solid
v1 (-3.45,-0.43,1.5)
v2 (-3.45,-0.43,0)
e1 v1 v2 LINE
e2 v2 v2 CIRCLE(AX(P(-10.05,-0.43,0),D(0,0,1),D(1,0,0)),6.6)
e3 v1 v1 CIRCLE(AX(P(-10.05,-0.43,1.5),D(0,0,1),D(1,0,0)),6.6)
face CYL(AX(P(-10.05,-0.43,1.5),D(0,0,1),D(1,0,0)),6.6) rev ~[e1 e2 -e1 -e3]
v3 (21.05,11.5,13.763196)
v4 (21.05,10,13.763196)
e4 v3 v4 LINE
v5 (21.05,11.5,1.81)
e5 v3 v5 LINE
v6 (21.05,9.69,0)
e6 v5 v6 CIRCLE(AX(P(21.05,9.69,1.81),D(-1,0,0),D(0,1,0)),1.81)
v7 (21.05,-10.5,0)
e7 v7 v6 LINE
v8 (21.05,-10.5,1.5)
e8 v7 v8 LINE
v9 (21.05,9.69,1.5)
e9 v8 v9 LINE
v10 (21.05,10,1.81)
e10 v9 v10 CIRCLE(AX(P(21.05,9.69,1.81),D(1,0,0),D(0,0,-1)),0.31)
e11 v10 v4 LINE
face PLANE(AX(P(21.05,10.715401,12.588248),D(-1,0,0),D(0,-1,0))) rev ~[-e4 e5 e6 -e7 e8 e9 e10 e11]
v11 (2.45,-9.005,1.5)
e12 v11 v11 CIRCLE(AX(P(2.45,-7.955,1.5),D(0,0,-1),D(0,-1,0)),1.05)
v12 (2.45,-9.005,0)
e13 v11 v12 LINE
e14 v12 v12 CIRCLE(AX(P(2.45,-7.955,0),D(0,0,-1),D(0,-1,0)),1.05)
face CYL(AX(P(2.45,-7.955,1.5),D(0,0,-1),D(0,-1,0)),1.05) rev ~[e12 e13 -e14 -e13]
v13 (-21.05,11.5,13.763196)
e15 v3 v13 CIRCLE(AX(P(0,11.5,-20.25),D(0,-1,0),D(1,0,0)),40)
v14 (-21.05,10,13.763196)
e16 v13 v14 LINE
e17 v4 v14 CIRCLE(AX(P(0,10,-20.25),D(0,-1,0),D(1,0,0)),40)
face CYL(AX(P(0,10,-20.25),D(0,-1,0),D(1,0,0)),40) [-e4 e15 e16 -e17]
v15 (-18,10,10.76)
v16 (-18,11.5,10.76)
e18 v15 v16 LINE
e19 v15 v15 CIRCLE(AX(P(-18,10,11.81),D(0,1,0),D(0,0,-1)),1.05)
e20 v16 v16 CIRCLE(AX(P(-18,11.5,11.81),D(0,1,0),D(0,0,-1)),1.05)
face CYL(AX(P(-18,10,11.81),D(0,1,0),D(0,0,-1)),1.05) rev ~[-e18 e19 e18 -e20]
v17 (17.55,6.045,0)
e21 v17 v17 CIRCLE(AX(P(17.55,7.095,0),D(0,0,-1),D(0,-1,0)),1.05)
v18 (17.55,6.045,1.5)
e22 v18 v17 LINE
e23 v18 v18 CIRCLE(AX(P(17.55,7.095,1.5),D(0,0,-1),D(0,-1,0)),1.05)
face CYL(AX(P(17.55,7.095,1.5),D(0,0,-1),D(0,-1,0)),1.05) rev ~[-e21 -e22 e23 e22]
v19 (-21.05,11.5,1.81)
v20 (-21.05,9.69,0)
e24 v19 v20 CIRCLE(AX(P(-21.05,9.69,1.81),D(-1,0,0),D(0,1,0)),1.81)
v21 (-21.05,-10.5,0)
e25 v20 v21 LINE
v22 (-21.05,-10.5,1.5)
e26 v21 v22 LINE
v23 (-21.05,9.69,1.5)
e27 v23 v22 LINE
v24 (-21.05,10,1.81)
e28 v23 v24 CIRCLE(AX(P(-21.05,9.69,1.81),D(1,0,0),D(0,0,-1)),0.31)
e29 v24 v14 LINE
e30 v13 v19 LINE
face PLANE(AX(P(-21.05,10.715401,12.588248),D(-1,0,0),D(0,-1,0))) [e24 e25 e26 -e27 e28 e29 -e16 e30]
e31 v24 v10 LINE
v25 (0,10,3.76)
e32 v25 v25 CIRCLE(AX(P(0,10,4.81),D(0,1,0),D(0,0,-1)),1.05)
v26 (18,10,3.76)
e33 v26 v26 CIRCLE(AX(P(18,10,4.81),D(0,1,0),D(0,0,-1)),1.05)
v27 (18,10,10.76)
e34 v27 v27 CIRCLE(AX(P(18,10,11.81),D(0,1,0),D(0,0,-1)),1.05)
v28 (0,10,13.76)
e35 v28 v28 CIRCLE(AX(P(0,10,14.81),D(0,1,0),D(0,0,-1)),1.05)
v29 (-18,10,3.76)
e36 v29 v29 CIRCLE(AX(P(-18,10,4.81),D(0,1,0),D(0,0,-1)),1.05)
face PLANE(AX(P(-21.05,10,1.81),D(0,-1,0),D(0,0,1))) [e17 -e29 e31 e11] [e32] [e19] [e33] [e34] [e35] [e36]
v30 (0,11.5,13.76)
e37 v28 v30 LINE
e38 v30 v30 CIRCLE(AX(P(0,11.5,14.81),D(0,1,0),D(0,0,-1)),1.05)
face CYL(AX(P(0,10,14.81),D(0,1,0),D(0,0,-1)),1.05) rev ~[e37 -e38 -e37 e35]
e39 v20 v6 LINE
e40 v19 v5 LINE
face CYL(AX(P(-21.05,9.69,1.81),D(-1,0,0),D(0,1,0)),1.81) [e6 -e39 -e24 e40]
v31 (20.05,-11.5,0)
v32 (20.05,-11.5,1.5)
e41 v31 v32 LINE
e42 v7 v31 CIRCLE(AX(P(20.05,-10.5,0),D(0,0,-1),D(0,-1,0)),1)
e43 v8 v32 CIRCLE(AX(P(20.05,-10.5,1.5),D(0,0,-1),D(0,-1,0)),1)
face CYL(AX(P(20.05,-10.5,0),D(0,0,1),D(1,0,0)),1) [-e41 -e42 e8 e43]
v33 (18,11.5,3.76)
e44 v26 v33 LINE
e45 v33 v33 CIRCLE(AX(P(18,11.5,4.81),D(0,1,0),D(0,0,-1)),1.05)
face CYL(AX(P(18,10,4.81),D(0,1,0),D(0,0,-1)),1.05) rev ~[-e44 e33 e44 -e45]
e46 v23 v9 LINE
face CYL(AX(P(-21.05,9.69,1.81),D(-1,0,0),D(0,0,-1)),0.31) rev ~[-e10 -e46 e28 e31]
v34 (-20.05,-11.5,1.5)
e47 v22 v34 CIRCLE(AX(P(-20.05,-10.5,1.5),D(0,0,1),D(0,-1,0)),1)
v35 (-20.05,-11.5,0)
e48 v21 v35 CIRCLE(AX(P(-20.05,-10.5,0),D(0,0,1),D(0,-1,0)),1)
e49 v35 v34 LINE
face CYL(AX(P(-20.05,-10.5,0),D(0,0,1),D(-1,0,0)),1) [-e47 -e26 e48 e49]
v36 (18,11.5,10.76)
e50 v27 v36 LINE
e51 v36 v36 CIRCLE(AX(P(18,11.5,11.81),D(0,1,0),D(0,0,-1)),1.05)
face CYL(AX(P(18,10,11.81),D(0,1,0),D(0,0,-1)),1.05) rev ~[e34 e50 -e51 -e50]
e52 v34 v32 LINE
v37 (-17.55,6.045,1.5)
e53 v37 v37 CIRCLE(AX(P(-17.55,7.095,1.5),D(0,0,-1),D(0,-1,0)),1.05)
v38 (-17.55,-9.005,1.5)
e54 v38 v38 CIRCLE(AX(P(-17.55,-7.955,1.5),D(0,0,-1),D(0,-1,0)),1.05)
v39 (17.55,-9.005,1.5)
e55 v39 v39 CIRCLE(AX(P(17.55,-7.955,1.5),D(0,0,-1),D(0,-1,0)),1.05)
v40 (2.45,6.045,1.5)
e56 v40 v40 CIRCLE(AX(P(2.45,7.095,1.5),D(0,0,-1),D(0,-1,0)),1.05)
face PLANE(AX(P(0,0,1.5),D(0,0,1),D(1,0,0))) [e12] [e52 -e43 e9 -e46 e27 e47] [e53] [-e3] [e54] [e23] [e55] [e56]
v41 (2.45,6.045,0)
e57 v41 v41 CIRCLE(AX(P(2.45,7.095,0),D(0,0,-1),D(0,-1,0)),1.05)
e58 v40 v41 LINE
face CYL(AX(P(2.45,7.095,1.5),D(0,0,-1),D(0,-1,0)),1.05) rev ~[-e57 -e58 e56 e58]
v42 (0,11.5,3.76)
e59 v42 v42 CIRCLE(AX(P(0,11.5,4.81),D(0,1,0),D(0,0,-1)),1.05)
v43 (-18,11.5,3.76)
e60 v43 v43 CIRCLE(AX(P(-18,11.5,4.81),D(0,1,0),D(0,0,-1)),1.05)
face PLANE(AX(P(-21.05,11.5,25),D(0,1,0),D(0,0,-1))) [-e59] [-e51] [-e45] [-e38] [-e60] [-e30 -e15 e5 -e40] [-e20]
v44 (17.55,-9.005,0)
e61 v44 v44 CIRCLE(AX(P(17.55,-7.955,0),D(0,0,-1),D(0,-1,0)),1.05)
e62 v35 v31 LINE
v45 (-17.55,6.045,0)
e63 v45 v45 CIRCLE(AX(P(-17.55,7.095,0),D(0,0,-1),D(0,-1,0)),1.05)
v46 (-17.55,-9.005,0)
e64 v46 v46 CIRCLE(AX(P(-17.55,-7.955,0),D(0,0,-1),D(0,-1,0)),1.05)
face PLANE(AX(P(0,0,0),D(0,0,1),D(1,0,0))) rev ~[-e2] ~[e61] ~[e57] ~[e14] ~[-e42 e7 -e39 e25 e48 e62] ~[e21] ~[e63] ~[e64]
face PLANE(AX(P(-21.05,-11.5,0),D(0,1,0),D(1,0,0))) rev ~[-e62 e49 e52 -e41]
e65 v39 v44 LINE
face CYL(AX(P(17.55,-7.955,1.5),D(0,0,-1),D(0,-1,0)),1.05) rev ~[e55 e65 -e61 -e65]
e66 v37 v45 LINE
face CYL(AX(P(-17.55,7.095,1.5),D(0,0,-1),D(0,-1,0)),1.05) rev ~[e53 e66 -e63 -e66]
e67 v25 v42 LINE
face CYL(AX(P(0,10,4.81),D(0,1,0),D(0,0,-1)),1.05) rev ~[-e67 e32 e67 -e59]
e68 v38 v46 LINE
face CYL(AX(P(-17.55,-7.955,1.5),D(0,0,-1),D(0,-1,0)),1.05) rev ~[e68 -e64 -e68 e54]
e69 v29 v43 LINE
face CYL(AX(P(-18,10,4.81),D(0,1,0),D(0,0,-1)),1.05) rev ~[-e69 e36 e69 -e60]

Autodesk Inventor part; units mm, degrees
ref_plane "YZ Plane" through (0, 0, 0) normal (1, 0, 0) x (0, 1, 0)
ref_plane "XZ Plane" through (0, 0, 0) normal (0, 1, 0) x (-1, 0, 0)
ref_plane "XY Plane" through (0, 0, 0) normal (0, 0, 1) x (1, 0, 0)
sketch "Sketch1" plane through (0, 0, 0) normal (0, 0, 1) x (1, 0, 0)
  line L0 (-21.05, -11.5) -> (21.05, -11.5)
  line L1 (21.05, -11.5) -> (21.05, 11.5)
  line L2 (21.05, 11.5) -> (-21.05, 11.5)
  line L3 (-21.05, 11.5) -> (-21.05, -11.5)
  line L4 (-21.05, -11.5) -> (21.05, 11.5) construction
  line L5 (21.05, -11.5) -> (-21.05, 11.5) construction
  point P0 (0, 0)
  dimension "d0" = 42.1
  dimension "d1" = 23
extrude "Plate1" add sketch "Sketch1" along normal blind 1.5
sketch "Sketch2" plane through (0, 0, 1.5) normal (0, 0, 1) x (1, 0, 0)
  circle A0 centre (17.55, 7.095) radius 0.7835 projected
  circle A1 centre (17.55, -7.955) radius 0.7835 projected
  circle A2 centre (2.45, 7.095) radius 0.7835 projected
  circle A3 centre (2.45, -7.955) radius 0.7835 projected
  circle A4 centre (-17.55, 7.095) radius 0.7835 projected
  circle A5 centre (-17.55, -7.955) radius 0.7835 projected
  point P0 (0, 0)
hole "Hole1" at (17.55, -7.955, 1.5) at (2.45, -7.955, 1.5) at (-17.55, -7.955, 1.5) at (-17.55, 7.095, 1.5) at (2.45, 7.095, 1.5) at (17.55, 7.095, 1.5) direction (0, 0, -1) diameter 2.1 end through all
sketch "Sketch3" plane through (0, 0, 1.5) normal (0, 0, 1) x (1, 0, 0)
  circle A0 centre (-10.05, -0.43) radius 6.4 projected
  circle A1 centre (-10.05, -0.43) radius 6.6
  point P0 (0, 0)
  dimension "d10" = 0.2
extrude "Extrusion1" cut sketch "Sketch3" against normal through all contours A0 | A1
sketch "Sketch4" plane through (-21.05, 10, 0) normal (0, 1, 0) x (-1, 0, 0)
  line L0 (-42.1, 0) -> (0, 0)
  line L1 (0, 0) -> (0, 25)
  line L2 (0, 25) -> (-42.1, 25)
  line L3 (-42.1, 25) -> (-42.1, 0)
edge flange "Flange1" height 25 angle 90 thickness 1.5 bend radius 0.31 thickness toward (0, 1, 0) relief tear relief width 1.5 relief depth 0.75 edges at (0, 11.5, 1.5) wall of the first edge with corners at (21.05, 10, 0) (-21.05, 10, 0) (-21.05, 10, 25) (21.05, 10, 25)
bend "Bend1"
corner "Corner1"
sketch "Sketch5" plane through (-21.05, 10, 25) normal (0, -1, 0) x (1, 0, 0)
  circle A0 centre (21.05, -45.25) radius 40 projected
  circle A1 centre (21.05, -45.25) radius 53
  point P0 (21.05, -25)
  dimension "d23" = 13
extrude "Cut1" cut sketch "Sketch5" against normal blind 1.5
fillet "Corner Round1" radius 1 2 edges at (21.05, -11.5, 0.75) (-21.05, -11.5, 0.75)
sketch "Sketch6" plane through (-21.05, 10, 1.81) normal (0, -1, 0) x (1, 0, 0)
  line L0 (0, 0) -> (42.1, 0) projected
  arc A0 (42.1, 11.9532) -> (0, 11.9532) centre (21.05, -22.06) ccw projected
  line L1 (21.05, 0) -> (21.05, 17.94) construction
  point P0 (21.05, -1.81)
  point P1 (3.05, 3)
  point P2 (3.05, 10)
  point P3 (21.05, 13)
  point P4 (21.05, 3)
  point P5 (39.05, 3)
  point P6 (39.05, 10)
  dimension "d27" = 10
  dimension "d28" = 3
  dimension "d29" = 18
  dimension "d30" = 7
hole "Hole2" at (-18, 10, 4.81) at (-18, 10, 11.81) at (0, 10, 14.81) at (0, 10, 4.81) at (18, 10, 4.81) at (18, 10, 11.81) direction (0, 1, 0) diameter 2.1 end through all
equation "\"d8\" = Thickness"
equation "\"d24\" = Thickness"
equation "\"d2\" = Thickness"
equation "\"d13\" = BendReliefWidth"
equation "\"d14\" = BendReliefDepth"
equation "\"d15\" = MinimumRemnant"
equation "\"d16\" = TransitionRadius"
equation "\"d19\" = BendRadius"
equation "\"d20\" = CornerReliefSize"
equation "\"d21\" = GapSize"
equation "\"d22\" = JacobiRadiusSize"
equation "\"BendReliefWidth\" = Thickness"
equation "\"BendReliefDepth\" = 0.5 * Thickness"
equation "\"CornerReliefSize\" = 4 * Thickness"
equation "\"MinimumRemnant\" = 2 * Thickness"
equation "\"TransitionRadius\" = BendRadius"
equation "\"JacobiRadiusSize\" = BendRadius"
equation "\"GapSize\" = Thickness"
equation "\"Thickness\" = 1.5"
equation "\"BendRadius\" = 0.31"
properties part number "axis_2_bottom_L_frame(bottom)" material "Aluminum 6061-AHC"
